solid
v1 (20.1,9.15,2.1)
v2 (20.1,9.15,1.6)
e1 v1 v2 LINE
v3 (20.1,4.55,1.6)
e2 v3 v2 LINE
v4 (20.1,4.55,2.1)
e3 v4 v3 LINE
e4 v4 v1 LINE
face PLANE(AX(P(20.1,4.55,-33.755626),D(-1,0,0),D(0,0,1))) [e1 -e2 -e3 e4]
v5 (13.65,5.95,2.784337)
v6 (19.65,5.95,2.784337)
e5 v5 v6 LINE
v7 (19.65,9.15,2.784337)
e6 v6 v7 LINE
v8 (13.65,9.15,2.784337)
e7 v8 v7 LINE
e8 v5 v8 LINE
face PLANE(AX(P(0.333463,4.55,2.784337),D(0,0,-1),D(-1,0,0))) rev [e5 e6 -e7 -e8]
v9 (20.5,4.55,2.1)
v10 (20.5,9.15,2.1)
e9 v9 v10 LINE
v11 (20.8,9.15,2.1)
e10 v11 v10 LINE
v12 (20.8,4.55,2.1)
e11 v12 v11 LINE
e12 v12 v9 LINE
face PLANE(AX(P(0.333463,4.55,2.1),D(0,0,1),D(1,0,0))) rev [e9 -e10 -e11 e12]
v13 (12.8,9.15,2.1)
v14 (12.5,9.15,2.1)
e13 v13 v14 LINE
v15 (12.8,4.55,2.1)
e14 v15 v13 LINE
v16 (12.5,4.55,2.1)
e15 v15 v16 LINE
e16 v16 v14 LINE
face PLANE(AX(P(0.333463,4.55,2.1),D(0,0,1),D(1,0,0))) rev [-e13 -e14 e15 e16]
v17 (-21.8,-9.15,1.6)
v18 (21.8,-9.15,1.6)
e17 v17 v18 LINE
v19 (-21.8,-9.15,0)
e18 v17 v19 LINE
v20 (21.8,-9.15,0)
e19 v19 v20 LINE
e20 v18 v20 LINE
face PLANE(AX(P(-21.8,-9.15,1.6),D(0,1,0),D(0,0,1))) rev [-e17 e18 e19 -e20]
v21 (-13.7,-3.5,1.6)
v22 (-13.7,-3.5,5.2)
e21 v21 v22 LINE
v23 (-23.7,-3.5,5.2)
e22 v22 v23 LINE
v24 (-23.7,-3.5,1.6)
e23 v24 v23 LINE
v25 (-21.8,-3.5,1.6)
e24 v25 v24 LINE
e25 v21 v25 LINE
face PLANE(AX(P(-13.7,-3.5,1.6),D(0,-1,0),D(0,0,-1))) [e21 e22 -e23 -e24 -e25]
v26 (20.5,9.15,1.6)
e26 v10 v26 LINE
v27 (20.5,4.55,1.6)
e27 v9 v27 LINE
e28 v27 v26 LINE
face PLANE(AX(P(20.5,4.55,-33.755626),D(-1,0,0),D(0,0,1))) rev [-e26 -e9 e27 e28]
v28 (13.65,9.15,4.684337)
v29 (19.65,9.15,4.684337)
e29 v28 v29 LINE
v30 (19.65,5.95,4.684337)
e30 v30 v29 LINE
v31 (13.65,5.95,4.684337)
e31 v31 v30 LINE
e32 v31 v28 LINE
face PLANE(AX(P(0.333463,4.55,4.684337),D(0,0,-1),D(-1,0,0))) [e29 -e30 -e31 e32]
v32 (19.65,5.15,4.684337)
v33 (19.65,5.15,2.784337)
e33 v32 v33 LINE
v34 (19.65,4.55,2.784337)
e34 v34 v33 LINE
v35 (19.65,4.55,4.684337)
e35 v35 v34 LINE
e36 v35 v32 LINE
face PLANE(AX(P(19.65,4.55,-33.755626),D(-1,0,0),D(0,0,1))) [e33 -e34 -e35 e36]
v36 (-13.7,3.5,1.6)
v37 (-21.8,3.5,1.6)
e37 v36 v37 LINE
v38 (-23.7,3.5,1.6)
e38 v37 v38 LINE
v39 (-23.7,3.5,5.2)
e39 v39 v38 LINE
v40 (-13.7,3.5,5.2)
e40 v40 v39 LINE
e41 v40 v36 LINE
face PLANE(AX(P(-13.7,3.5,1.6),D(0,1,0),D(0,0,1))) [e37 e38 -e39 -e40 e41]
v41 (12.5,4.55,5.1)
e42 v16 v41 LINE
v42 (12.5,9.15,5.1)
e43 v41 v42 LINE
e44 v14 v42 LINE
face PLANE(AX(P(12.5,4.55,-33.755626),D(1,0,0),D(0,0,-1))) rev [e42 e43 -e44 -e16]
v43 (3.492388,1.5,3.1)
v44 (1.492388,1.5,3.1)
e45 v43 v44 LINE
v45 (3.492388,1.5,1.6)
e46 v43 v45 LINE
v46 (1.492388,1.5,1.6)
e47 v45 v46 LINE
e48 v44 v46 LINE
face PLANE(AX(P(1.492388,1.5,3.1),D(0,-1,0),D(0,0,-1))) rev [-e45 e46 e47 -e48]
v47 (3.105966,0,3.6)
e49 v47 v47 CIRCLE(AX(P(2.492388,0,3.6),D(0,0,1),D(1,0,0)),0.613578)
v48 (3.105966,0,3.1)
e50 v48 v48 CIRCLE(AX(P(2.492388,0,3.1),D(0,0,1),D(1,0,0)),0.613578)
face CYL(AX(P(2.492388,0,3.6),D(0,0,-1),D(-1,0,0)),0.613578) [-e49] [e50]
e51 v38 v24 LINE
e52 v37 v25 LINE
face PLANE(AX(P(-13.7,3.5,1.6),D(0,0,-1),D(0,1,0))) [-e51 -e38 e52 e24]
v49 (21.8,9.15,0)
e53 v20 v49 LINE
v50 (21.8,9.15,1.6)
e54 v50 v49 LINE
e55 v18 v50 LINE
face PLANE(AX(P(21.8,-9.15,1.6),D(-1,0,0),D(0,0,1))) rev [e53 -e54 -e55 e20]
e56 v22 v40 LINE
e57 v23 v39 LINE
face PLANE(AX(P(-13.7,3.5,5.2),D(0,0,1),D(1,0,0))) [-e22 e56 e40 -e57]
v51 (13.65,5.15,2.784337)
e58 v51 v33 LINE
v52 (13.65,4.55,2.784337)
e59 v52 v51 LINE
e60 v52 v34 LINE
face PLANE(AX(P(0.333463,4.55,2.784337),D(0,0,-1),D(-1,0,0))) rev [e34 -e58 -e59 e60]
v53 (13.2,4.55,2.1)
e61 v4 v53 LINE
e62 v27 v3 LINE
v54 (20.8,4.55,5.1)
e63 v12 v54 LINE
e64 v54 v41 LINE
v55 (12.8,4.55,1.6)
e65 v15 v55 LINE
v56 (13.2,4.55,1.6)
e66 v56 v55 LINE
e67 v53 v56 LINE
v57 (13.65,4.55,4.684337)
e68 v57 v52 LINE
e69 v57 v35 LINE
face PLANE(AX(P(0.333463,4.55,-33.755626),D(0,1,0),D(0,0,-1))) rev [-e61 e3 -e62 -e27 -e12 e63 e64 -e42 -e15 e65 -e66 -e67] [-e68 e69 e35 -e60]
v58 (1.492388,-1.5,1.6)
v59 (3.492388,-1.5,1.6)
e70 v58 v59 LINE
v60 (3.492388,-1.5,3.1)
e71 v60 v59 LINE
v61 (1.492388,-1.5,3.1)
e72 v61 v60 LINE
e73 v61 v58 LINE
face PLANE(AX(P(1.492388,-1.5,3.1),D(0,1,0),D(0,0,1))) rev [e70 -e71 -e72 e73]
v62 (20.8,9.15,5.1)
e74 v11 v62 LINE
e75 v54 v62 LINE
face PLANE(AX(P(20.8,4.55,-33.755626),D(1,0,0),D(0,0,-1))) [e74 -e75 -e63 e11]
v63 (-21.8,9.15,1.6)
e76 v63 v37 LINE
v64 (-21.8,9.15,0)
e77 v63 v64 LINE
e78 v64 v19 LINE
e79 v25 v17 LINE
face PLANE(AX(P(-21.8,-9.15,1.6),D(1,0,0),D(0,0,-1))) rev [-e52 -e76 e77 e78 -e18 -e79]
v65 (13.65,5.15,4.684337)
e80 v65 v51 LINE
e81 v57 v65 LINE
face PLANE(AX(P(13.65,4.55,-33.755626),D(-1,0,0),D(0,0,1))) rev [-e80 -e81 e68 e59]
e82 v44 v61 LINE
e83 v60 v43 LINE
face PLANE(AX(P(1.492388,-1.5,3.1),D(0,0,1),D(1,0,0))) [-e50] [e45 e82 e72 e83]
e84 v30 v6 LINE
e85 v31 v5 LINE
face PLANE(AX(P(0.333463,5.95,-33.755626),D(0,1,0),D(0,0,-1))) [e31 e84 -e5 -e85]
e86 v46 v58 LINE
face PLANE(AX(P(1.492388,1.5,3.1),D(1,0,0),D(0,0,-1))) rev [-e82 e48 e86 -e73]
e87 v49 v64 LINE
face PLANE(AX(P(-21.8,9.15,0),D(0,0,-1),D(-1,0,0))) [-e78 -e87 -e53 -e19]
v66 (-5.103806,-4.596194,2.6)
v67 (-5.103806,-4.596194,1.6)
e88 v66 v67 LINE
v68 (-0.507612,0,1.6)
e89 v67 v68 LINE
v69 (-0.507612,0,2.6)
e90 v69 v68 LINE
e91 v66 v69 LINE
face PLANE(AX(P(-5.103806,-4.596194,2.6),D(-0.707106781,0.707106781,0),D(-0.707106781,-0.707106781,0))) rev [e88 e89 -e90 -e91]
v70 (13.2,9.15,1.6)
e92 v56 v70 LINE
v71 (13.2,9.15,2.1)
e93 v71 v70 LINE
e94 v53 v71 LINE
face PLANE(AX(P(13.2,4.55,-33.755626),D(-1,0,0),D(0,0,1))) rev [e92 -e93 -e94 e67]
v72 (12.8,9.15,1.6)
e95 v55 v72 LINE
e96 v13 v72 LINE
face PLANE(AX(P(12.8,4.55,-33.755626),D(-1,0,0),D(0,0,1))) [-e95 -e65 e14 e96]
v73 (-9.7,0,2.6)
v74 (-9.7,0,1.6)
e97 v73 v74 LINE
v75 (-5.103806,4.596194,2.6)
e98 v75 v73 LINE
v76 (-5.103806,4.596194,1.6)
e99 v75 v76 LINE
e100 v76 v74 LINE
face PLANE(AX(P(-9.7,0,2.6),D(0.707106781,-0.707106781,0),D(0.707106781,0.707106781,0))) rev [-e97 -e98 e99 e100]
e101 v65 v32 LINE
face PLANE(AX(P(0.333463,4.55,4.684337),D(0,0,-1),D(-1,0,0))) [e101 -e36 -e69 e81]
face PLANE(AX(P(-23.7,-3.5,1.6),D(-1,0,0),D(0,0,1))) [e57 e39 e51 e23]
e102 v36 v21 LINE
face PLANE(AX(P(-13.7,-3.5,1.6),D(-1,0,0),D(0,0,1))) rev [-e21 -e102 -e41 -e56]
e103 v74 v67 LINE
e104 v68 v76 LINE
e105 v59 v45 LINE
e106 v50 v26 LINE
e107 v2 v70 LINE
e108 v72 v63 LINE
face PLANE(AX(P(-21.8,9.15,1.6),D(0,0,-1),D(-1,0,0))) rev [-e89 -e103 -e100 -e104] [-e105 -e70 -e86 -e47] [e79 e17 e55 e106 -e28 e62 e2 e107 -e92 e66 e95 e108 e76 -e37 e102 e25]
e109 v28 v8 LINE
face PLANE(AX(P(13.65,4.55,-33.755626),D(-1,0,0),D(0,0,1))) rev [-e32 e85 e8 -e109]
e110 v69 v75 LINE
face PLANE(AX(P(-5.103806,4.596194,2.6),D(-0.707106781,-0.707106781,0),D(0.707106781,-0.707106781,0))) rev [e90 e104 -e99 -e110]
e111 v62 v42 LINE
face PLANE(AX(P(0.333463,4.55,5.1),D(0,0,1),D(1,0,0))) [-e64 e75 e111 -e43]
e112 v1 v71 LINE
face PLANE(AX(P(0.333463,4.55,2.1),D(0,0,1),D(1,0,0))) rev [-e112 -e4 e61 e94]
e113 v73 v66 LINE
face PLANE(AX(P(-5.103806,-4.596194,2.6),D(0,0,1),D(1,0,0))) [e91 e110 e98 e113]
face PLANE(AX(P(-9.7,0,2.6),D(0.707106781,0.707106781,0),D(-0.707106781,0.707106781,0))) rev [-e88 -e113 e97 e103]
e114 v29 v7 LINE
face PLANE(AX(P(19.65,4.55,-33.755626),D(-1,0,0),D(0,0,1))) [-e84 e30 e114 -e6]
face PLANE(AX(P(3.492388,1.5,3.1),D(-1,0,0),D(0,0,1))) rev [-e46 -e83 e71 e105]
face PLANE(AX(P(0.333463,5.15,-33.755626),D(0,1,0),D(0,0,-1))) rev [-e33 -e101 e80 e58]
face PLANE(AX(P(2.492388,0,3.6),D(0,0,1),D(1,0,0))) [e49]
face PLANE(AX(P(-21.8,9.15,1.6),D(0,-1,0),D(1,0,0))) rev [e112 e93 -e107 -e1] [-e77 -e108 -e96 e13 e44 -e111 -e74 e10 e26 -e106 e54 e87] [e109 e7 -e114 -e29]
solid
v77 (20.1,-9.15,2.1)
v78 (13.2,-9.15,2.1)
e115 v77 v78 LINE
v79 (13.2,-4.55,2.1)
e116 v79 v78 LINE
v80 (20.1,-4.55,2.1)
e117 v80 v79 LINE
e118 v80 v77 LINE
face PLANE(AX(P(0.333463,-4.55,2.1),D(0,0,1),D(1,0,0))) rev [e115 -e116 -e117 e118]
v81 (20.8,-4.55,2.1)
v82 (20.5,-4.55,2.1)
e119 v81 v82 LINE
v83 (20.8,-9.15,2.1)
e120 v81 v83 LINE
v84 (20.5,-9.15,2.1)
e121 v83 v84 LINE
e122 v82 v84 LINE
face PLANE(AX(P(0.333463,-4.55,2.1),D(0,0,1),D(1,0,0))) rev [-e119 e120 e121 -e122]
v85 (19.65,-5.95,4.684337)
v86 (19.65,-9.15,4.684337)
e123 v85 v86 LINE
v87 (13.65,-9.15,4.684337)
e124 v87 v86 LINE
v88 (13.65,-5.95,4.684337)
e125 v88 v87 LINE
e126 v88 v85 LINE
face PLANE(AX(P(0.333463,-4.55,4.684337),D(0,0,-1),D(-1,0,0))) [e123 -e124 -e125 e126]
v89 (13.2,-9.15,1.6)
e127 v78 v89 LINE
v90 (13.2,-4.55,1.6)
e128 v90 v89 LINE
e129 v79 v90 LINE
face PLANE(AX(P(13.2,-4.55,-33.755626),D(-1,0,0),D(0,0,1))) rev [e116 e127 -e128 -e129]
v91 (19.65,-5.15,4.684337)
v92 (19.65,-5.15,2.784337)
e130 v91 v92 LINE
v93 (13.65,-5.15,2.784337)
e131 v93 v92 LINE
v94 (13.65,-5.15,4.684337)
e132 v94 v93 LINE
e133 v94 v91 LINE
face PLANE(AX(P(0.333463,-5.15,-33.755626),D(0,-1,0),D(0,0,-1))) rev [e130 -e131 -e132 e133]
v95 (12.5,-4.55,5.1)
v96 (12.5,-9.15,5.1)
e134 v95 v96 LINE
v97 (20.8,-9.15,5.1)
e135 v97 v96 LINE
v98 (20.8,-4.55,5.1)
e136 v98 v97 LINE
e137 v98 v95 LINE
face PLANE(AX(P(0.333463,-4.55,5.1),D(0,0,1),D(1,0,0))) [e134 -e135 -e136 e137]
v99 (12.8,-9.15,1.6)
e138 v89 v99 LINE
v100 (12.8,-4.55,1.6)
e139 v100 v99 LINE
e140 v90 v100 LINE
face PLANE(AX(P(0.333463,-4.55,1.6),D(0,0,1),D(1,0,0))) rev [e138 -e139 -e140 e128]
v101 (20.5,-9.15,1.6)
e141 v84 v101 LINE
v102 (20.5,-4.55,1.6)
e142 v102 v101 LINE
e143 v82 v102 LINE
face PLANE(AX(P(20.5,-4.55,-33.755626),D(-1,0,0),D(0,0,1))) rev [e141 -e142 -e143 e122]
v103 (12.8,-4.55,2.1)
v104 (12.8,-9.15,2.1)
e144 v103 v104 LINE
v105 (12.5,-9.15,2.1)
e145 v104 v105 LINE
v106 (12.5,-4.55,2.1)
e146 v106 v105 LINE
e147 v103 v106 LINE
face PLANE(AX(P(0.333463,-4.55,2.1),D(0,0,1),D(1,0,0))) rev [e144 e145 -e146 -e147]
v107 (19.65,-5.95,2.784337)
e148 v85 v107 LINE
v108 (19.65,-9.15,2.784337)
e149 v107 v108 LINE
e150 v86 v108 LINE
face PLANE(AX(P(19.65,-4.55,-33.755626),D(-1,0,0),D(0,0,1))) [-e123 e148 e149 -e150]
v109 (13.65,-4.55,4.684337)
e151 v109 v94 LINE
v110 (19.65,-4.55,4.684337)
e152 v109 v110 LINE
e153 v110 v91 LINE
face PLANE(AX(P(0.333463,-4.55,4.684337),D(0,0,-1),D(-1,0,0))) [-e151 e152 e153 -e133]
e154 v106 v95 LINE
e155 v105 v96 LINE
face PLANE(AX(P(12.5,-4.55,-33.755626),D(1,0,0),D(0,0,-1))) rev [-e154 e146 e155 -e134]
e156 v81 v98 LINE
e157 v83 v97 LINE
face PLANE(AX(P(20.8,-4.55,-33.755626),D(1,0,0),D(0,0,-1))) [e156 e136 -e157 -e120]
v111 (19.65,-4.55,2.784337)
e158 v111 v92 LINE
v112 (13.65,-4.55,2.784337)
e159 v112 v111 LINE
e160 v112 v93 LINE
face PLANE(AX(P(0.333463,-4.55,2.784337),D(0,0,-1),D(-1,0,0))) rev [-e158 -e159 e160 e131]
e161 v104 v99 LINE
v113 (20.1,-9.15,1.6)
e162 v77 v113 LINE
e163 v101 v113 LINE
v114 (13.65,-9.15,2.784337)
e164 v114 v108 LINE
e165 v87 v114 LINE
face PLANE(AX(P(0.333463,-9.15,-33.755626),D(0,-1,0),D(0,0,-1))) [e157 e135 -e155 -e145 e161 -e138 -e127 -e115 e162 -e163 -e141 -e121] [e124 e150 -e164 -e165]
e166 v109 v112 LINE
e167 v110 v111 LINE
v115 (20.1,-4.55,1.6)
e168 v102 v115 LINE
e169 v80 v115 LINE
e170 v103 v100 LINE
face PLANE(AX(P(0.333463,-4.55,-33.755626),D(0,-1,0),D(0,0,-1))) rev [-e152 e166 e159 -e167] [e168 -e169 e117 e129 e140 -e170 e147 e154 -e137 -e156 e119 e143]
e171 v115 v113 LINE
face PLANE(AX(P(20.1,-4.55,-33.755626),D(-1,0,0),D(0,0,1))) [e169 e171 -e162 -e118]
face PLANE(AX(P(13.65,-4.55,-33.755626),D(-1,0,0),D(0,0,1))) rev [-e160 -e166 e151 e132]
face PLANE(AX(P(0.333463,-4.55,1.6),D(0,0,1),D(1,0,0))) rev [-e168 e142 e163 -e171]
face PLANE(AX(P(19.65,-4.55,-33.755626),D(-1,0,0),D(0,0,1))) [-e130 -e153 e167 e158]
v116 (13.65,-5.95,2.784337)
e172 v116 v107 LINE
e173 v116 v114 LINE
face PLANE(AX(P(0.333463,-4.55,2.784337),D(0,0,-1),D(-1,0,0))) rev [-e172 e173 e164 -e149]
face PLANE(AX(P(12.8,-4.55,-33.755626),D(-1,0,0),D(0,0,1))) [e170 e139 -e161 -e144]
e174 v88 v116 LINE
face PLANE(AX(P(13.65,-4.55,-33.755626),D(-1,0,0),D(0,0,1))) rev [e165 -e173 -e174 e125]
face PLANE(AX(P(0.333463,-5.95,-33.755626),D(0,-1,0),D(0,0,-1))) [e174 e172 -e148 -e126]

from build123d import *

# Parameters (mm, degrees)
SKETCH1_W               = 43.6
SKETCH1_H               = 18.3
BOSS_EXTRUDE1_DEPTH     = 1.6
USB_START               = 1.9
SKETCH2_W               = 3.6
SKETCH2_H               = 7
USB_CONNECTOR_DEPTH     = 10
MICROPROCESSOR_DEPTH    = 1
SKETCH4_W               = 2
SKETCH4_H               = 3
BUTTON_BASE_DEPTH       = 1.5
SKETCH5_R               = 0.613578093
BUTTON_DEPTH            = 0.5
SKETCH6_W               = 8.3
SKETCH6_H               = 3
SKETCH6_W_2             = 6
SKETCH6_H_2             = 1.9
SKETCH6_W_3             = 0.4
SKETCH6_H_3             = 0.5
JST_X_6_DEPTH           = 4.6
BOSS_EXTRUDE8_START     = -4
BOSS_EXTRUDE8_OUTLINE_W = 6
BOSS_EXTRUDE8_OUTLINE_H = 1.9
BOSS_EXTRUDE8_DEPTH     = 0.8


# Read off the part's stored shape, not the designer's step: Boss-Extrude8
with BuildPart() as part:
    # Sketch1 → Boss-Extrude1 (new body)
    with BuildSketch(Plane.XY):
        Rectangle(SKETCH1_W, SKETCH1_H)
    extrude(amount=BOSS_EXTRUDE1_DEPTH)

    # Sketch2 → USB Connector (add)
    with BuildSketch(Plane.ZY.offset(21.8).offset(USB_START)):
        with Locations((3.4, 0)):
            Rectangle(SKETCH2_W, SKETCH2_H)
    extrude(amount=-USB_CONNECTOR_DEPTH)

    # Sketch3 → MicroProcessor (add)
    with BuildSketch(Plane.XY.offset(1.6)):
        Polygon((-9.7, 0), (-5.103805922, 4.596194078), (-0.507611845, 0), (-5.103805922, -4.596194078), align=None)
    extrude(amount=MICROPROCESSOR_DEPTH)

    # Sketch4 → Button Base (add)
    with BuildSketch(Plane.XY.offset(1.6)):
        with Locations((2.492388155, 0)):
            Rectangle(SKETCH4_W, SKETCH4_H)
    extrude(amount=BUTTON_BASE_DEPTH)

    # Sketch5 → Button (add)
    with BuildSketch(Plane.XY.offset(3.1)):
        with Locations((2.492388155, 0)):
            Circle(SKETCH5_R)
    extrude(amount=BUTTON_DEPTH)


with BuildPart() as body_2:
    # Sketch6 → JST x 6 (new body)
    # profile 1 of 3: a face of its own
    with BuildSketch(Plane.XZ.offset(9.15)):
        with Locations((16.65, 3.6)):
            Rectangle(SKETCH6_W, SKETCH6_H)
        with Locations((16.65, 3.734337349)):
            Rectangle(SKETCH6_W_2, SKETCH6_H_2, mode=Mode.SUBTRACT)
    # profile 2 of 3: a face of its own
    with BuildSketch(Plane.XZ.offset(9.15)):
        with Locations((13, 1.85)):
            Rectangle(SKETCH6_W_3, SKETCH6_H_3)
    # profile 3 of 3: a face of its own
    with BuildSketch(Plane.XZ.offset(9.15)):
        with Locations((20.3, 1.85)):
            Rectangle(SKETCH6_W_3, SKETCH6_H_3)
    jst_x_6 = extrude(amount=-JST_X_6_DEPTH)

    # Boss-Extrude8 outline → Boss-Extrude8 (add)
    with BuildSketch(Plane.XZ.offset(9.15).offset(BOSS_EXTRUDE8_START)):
        with Locations((16.65, 3.734337349)):
            Rectangle(BOSS_EXTRUDE8_OUTLINE_W, BOSS_EXTRUDE8_OUTLINE_H)
    boss_extrude8 = extrude(amount=BOSS_EXTRUDE8_DEPTH)


with BuildPart() as part_1:
    add(part.part)

    # Mirror5: JST x 6, Boss-Extrude8 across plane
    add(jst_x_6.mirror(Plane.ZX))
    add(boss_extrude8.mirror(Plane.ZX))


solid = Compound([body_2.part, part_1.part])
